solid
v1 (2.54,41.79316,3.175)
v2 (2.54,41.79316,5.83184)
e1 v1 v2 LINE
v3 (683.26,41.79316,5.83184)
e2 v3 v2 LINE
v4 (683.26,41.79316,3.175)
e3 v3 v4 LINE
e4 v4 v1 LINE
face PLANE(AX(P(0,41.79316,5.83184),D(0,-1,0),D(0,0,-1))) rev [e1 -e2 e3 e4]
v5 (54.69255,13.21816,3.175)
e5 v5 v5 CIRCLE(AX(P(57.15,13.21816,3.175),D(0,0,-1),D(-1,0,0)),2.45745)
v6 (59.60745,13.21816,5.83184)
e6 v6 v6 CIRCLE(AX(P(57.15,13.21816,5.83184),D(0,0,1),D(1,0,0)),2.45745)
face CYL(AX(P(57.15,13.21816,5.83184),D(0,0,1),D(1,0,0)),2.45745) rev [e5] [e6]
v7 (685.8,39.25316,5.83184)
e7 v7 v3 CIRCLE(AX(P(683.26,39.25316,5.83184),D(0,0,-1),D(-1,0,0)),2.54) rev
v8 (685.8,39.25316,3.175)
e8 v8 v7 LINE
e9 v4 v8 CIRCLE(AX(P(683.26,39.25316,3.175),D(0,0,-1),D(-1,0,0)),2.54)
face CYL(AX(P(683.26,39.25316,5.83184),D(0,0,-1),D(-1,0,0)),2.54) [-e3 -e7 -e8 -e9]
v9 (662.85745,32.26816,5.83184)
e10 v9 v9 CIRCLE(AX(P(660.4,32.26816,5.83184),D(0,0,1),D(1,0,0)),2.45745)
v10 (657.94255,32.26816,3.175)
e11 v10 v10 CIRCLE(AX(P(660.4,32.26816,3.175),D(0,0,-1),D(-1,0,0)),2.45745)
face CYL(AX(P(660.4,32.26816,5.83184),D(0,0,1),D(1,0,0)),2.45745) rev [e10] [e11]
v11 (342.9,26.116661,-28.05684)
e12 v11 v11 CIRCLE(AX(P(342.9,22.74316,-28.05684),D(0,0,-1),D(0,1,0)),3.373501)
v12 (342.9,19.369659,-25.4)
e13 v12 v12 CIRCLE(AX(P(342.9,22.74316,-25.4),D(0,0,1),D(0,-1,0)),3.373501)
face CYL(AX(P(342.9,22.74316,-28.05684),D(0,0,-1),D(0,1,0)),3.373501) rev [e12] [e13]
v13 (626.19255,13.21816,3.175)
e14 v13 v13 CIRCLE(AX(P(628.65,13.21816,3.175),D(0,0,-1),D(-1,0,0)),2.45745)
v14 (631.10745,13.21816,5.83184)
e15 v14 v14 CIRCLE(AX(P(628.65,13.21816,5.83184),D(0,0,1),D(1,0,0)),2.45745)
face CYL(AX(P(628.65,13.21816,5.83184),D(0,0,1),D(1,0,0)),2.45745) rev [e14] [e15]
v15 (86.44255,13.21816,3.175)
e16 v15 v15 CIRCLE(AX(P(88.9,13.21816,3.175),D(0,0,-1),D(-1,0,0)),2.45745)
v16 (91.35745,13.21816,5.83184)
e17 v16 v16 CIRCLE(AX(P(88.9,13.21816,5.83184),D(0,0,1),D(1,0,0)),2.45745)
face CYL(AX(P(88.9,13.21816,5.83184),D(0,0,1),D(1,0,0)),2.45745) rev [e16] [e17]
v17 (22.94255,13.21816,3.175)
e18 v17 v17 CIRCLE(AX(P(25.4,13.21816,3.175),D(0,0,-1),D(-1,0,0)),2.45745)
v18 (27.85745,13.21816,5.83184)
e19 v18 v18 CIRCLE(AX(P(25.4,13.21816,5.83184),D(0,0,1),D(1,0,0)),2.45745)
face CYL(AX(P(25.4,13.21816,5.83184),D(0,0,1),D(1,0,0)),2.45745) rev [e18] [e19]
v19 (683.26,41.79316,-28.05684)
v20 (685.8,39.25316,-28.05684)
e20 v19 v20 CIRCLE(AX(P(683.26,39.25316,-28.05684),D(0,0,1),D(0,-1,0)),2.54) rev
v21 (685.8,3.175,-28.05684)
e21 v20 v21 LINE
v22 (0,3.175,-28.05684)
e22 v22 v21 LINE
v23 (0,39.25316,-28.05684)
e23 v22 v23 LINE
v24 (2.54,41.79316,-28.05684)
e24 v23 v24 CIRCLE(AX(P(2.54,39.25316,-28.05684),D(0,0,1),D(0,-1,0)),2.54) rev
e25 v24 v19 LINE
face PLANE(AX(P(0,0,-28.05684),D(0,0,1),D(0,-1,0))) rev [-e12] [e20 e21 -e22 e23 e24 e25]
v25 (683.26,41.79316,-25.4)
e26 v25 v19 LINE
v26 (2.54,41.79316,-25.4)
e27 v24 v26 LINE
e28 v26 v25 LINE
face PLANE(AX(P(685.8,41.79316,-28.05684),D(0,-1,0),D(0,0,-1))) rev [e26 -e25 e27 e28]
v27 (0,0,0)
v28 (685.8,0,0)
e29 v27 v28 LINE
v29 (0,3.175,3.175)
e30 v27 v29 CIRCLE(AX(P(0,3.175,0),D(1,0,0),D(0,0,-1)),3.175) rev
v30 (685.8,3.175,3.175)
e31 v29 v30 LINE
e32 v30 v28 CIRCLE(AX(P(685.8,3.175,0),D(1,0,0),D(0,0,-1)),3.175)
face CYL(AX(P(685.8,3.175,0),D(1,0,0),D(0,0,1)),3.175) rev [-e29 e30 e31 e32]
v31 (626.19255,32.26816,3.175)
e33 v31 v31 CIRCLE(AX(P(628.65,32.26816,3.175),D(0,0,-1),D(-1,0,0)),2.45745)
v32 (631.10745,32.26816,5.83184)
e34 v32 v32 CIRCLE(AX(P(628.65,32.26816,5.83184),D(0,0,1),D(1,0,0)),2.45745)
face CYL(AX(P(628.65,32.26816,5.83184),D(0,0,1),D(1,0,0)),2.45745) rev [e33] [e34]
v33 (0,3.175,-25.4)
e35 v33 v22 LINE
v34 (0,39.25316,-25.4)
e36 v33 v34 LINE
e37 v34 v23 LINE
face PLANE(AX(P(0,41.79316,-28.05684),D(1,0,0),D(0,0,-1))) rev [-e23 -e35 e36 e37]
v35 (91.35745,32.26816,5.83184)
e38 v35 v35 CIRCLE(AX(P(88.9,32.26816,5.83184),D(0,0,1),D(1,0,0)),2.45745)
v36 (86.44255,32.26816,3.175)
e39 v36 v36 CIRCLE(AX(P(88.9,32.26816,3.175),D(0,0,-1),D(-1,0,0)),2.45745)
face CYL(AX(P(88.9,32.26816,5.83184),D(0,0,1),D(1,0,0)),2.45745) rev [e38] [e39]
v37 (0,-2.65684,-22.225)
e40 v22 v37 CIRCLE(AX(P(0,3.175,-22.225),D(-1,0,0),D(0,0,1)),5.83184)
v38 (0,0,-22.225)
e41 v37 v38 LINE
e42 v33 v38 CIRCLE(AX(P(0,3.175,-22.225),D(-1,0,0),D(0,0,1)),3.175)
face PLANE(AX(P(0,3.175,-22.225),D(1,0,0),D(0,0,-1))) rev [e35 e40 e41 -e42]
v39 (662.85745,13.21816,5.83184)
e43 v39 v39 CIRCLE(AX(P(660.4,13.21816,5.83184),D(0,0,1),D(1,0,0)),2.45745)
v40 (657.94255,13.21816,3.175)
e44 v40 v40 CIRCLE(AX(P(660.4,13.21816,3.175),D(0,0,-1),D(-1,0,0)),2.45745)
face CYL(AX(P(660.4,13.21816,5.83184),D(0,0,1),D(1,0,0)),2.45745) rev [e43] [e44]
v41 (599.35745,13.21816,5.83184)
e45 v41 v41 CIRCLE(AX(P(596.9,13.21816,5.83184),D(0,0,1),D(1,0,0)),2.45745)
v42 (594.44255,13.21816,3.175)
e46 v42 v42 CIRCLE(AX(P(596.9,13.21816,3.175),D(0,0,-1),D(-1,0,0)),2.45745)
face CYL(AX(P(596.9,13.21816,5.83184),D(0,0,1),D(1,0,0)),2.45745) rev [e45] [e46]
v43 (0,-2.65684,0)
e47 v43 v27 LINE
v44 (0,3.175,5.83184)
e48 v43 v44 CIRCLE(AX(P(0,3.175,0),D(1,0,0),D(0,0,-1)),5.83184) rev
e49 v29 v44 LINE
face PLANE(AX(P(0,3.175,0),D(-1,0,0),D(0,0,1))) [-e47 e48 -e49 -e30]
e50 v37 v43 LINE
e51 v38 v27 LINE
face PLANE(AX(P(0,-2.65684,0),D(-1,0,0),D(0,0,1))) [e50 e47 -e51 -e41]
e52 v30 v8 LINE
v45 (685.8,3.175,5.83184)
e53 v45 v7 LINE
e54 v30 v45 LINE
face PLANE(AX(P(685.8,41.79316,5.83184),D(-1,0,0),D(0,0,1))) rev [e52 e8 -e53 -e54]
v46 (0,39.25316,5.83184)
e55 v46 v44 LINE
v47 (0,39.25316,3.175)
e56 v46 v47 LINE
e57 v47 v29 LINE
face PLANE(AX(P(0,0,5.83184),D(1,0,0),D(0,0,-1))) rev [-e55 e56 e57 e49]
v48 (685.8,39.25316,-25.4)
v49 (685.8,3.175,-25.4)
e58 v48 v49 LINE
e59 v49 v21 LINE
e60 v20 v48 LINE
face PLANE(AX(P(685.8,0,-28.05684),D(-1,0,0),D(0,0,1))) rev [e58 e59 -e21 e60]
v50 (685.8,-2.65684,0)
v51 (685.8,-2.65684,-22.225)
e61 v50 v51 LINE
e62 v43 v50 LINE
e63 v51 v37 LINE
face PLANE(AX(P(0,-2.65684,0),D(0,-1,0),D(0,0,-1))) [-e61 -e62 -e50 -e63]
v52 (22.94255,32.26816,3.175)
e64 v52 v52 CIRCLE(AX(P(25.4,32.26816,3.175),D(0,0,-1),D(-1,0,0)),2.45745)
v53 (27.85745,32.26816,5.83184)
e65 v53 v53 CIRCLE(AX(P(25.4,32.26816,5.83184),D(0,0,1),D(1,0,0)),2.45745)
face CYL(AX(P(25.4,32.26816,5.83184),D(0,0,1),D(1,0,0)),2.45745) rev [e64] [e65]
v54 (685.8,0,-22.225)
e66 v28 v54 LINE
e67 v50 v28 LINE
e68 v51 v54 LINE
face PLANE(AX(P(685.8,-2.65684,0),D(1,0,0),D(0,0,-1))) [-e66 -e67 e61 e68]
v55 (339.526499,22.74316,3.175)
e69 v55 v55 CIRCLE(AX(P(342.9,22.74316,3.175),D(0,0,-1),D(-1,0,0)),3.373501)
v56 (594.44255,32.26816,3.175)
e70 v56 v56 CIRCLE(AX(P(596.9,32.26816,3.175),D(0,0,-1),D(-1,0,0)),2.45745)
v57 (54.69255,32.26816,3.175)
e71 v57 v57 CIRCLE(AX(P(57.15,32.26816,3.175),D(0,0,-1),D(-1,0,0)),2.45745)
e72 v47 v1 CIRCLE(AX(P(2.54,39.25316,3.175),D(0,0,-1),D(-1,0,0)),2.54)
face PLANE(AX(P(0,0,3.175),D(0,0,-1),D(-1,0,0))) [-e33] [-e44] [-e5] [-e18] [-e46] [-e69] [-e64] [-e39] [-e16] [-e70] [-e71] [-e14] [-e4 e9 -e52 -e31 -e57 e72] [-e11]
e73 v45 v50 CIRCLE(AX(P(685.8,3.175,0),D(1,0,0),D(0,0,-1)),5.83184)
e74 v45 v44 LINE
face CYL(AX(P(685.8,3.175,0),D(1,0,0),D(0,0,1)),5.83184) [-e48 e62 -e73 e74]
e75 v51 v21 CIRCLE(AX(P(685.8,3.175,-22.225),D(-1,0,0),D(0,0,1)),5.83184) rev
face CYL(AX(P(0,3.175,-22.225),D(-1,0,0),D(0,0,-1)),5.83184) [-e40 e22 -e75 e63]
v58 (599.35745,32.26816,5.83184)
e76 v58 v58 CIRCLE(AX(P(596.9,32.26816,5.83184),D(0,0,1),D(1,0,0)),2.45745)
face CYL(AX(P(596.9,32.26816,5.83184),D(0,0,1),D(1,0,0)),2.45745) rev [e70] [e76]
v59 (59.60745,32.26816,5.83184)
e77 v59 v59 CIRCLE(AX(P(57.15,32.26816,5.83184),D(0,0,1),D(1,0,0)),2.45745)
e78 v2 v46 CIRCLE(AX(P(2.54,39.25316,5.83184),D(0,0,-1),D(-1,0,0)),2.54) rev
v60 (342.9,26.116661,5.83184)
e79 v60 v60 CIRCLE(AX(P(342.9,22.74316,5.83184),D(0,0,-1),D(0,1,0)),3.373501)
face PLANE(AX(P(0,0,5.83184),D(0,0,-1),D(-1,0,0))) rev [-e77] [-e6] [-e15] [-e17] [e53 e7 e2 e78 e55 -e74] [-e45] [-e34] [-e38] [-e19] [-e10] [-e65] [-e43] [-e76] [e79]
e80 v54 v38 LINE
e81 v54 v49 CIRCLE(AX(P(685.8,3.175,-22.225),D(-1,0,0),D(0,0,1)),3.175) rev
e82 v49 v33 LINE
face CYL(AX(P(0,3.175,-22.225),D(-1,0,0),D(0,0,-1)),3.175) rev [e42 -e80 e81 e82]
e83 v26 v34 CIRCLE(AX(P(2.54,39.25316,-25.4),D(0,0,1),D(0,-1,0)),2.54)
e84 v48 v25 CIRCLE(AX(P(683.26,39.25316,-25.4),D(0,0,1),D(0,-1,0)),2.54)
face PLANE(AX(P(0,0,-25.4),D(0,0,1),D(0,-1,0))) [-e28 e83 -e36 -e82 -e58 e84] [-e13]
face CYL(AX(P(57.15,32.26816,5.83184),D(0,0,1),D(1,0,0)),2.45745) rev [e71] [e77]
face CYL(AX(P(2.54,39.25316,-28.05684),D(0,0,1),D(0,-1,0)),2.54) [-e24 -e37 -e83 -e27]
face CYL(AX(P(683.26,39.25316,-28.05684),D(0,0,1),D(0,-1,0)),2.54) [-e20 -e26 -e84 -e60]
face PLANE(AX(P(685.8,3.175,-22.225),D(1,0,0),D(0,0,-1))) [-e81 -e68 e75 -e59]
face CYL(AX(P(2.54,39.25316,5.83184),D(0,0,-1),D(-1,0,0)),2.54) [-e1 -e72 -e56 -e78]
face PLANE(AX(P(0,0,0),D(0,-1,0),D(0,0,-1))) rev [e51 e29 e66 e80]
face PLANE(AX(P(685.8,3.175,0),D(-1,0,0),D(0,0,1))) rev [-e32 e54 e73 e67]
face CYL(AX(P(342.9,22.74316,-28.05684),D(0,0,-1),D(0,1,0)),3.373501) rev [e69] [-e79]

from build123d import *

# Parameters (mm, degrees)
SKETCH1_W                        = 685.8
SKETCH1_H                        = 22.225
BASE_FLANGE1_DEPTH               = 2.65684
EDGE_FLANGE1_DEPTH               = 685.8
EDGE_FLANGE2_DEPTH               = 685.8
F_17_64_0_26563_DIAMETER_HOLE1_D = 6.747002
F_10_0_1935_DIAMETER_HOLE1_D     = 4.9149
F_10_0_1935_DIAMETER_HOLE1_DEPTH = 2.65684
FILLET1_R                        = 2.54


# Sheet-metal steps are written as plain solids
with BuildPart() as part:
    # Sketch1 → Base-Flange1 (new body)
    with BuildSketch(Plane(origin=(0, 0, 0), x_dir=(1, 0, 0), z_dir=(0, 1, 0))):
        with Locations((342.9, 11.1125)):
            Rectangle(SKETCH1_W, SKETCH1_H)
    extrude(amount=-BASE_FLANGE1_DEPTH)

    # Edge-Flange1 section (across the edge) → Edge-Flange1 (add)
    with BuildSketch(Plane(origin=(0, 0, 3.175), x_dir=(0, 0, -1), z_dir=(1, 0, 0))):
        with BuildLine():
            Line((-2.65684, 3.175), (-2.65684, 41.79316))
            Line((-2.65684, 41.79316), (0, 41.79316))
            Line((0, 41.79316), (0, 3.175))
            ThreePointArc((0, 3.175), (0.92993597, 0.92993597), (3.175, 0))
            Line((3.175, 0), (3.175, -2.65684))
            ThreePointArc((3.175, -2.65684), (-0.948733611, -0.948733611), (-2.65684, 3.175))
        make_face()
    extrude(amount=EDGE_FLANGE1_DEPTH)

    # Edge-Flange2 section (across the edge) → Edge-Flange2 (add)
    with BuildSketch(Plane(origin=(685.8, 0, -25.4), x_dir=(0, 0, 1), z_dir=(-1, 0, 0))):
        with BuildLine():
            Line((-2.65684, 3.175), (-2.65684, 41.79316))
            Line((-2.65684, 41.79316), (0, 41.79316))
            Line((0, 41.79316), (0, 3.175))
            ThreePointArc((0, 3.175), (0.92993597, 0.92993597), (3.175, 0))
            Line((3.175, 0), (3.175, -2.65684))
            ThreePointArc((3.175, -2.65684), (-0.948733611, -0.948733611), (-2.65684, 3.175))
        make_face()
    extrude(amount=EDGE_FLANGE2_DEPTH)

    # 17/64 (0.26563) Diameter Hole1 (through all)
    with Locations(Plane(origin=(0, 0, -28.05684), x_dir=(-1, 0, 0), z_dir=(0, 0, -1))):
        with Locations((-342.9, 22.74316)):
            Hole(F_17_64_0_26563_DIAMETER_HOLE1_D / 2)

    # #10 (0.1935) Diameter Hole1
    with Locations(Plane.XY.offset(5.83184)):
        with Locations((596.9, 13.21816), (596.9, 32.26816), (628.65, 32.26816), (628.65, 13.21816), (660.4, 13.21816), (660.4, 32.26816), (88.9, 13.21816), (88.9, 32.26816), (57.15, 13.21816), (57.15, 32.26816), (25.4, 13.21816), (25.4, 32.26816)):
            Hole(F_10_0_1935_DIAMETER_HOLE1_D / 2, depth=F_10_0_1935_DIAMETER_HOLE1_DEPTH)

    # Fillet1
    fillet1_edges = [part.edges().sort_by_distance(p)[0] for p in [
        (0, 41.79316, 4.50342),
        (685.8, 41.79316, 4.50342),
        (685.8, 41.79316, -26.72842),
        (0, 41.79316, -26.72842),
    ]]
    fillet(fillet1_edges, radius=FILLET1_R)


solid = part.part
